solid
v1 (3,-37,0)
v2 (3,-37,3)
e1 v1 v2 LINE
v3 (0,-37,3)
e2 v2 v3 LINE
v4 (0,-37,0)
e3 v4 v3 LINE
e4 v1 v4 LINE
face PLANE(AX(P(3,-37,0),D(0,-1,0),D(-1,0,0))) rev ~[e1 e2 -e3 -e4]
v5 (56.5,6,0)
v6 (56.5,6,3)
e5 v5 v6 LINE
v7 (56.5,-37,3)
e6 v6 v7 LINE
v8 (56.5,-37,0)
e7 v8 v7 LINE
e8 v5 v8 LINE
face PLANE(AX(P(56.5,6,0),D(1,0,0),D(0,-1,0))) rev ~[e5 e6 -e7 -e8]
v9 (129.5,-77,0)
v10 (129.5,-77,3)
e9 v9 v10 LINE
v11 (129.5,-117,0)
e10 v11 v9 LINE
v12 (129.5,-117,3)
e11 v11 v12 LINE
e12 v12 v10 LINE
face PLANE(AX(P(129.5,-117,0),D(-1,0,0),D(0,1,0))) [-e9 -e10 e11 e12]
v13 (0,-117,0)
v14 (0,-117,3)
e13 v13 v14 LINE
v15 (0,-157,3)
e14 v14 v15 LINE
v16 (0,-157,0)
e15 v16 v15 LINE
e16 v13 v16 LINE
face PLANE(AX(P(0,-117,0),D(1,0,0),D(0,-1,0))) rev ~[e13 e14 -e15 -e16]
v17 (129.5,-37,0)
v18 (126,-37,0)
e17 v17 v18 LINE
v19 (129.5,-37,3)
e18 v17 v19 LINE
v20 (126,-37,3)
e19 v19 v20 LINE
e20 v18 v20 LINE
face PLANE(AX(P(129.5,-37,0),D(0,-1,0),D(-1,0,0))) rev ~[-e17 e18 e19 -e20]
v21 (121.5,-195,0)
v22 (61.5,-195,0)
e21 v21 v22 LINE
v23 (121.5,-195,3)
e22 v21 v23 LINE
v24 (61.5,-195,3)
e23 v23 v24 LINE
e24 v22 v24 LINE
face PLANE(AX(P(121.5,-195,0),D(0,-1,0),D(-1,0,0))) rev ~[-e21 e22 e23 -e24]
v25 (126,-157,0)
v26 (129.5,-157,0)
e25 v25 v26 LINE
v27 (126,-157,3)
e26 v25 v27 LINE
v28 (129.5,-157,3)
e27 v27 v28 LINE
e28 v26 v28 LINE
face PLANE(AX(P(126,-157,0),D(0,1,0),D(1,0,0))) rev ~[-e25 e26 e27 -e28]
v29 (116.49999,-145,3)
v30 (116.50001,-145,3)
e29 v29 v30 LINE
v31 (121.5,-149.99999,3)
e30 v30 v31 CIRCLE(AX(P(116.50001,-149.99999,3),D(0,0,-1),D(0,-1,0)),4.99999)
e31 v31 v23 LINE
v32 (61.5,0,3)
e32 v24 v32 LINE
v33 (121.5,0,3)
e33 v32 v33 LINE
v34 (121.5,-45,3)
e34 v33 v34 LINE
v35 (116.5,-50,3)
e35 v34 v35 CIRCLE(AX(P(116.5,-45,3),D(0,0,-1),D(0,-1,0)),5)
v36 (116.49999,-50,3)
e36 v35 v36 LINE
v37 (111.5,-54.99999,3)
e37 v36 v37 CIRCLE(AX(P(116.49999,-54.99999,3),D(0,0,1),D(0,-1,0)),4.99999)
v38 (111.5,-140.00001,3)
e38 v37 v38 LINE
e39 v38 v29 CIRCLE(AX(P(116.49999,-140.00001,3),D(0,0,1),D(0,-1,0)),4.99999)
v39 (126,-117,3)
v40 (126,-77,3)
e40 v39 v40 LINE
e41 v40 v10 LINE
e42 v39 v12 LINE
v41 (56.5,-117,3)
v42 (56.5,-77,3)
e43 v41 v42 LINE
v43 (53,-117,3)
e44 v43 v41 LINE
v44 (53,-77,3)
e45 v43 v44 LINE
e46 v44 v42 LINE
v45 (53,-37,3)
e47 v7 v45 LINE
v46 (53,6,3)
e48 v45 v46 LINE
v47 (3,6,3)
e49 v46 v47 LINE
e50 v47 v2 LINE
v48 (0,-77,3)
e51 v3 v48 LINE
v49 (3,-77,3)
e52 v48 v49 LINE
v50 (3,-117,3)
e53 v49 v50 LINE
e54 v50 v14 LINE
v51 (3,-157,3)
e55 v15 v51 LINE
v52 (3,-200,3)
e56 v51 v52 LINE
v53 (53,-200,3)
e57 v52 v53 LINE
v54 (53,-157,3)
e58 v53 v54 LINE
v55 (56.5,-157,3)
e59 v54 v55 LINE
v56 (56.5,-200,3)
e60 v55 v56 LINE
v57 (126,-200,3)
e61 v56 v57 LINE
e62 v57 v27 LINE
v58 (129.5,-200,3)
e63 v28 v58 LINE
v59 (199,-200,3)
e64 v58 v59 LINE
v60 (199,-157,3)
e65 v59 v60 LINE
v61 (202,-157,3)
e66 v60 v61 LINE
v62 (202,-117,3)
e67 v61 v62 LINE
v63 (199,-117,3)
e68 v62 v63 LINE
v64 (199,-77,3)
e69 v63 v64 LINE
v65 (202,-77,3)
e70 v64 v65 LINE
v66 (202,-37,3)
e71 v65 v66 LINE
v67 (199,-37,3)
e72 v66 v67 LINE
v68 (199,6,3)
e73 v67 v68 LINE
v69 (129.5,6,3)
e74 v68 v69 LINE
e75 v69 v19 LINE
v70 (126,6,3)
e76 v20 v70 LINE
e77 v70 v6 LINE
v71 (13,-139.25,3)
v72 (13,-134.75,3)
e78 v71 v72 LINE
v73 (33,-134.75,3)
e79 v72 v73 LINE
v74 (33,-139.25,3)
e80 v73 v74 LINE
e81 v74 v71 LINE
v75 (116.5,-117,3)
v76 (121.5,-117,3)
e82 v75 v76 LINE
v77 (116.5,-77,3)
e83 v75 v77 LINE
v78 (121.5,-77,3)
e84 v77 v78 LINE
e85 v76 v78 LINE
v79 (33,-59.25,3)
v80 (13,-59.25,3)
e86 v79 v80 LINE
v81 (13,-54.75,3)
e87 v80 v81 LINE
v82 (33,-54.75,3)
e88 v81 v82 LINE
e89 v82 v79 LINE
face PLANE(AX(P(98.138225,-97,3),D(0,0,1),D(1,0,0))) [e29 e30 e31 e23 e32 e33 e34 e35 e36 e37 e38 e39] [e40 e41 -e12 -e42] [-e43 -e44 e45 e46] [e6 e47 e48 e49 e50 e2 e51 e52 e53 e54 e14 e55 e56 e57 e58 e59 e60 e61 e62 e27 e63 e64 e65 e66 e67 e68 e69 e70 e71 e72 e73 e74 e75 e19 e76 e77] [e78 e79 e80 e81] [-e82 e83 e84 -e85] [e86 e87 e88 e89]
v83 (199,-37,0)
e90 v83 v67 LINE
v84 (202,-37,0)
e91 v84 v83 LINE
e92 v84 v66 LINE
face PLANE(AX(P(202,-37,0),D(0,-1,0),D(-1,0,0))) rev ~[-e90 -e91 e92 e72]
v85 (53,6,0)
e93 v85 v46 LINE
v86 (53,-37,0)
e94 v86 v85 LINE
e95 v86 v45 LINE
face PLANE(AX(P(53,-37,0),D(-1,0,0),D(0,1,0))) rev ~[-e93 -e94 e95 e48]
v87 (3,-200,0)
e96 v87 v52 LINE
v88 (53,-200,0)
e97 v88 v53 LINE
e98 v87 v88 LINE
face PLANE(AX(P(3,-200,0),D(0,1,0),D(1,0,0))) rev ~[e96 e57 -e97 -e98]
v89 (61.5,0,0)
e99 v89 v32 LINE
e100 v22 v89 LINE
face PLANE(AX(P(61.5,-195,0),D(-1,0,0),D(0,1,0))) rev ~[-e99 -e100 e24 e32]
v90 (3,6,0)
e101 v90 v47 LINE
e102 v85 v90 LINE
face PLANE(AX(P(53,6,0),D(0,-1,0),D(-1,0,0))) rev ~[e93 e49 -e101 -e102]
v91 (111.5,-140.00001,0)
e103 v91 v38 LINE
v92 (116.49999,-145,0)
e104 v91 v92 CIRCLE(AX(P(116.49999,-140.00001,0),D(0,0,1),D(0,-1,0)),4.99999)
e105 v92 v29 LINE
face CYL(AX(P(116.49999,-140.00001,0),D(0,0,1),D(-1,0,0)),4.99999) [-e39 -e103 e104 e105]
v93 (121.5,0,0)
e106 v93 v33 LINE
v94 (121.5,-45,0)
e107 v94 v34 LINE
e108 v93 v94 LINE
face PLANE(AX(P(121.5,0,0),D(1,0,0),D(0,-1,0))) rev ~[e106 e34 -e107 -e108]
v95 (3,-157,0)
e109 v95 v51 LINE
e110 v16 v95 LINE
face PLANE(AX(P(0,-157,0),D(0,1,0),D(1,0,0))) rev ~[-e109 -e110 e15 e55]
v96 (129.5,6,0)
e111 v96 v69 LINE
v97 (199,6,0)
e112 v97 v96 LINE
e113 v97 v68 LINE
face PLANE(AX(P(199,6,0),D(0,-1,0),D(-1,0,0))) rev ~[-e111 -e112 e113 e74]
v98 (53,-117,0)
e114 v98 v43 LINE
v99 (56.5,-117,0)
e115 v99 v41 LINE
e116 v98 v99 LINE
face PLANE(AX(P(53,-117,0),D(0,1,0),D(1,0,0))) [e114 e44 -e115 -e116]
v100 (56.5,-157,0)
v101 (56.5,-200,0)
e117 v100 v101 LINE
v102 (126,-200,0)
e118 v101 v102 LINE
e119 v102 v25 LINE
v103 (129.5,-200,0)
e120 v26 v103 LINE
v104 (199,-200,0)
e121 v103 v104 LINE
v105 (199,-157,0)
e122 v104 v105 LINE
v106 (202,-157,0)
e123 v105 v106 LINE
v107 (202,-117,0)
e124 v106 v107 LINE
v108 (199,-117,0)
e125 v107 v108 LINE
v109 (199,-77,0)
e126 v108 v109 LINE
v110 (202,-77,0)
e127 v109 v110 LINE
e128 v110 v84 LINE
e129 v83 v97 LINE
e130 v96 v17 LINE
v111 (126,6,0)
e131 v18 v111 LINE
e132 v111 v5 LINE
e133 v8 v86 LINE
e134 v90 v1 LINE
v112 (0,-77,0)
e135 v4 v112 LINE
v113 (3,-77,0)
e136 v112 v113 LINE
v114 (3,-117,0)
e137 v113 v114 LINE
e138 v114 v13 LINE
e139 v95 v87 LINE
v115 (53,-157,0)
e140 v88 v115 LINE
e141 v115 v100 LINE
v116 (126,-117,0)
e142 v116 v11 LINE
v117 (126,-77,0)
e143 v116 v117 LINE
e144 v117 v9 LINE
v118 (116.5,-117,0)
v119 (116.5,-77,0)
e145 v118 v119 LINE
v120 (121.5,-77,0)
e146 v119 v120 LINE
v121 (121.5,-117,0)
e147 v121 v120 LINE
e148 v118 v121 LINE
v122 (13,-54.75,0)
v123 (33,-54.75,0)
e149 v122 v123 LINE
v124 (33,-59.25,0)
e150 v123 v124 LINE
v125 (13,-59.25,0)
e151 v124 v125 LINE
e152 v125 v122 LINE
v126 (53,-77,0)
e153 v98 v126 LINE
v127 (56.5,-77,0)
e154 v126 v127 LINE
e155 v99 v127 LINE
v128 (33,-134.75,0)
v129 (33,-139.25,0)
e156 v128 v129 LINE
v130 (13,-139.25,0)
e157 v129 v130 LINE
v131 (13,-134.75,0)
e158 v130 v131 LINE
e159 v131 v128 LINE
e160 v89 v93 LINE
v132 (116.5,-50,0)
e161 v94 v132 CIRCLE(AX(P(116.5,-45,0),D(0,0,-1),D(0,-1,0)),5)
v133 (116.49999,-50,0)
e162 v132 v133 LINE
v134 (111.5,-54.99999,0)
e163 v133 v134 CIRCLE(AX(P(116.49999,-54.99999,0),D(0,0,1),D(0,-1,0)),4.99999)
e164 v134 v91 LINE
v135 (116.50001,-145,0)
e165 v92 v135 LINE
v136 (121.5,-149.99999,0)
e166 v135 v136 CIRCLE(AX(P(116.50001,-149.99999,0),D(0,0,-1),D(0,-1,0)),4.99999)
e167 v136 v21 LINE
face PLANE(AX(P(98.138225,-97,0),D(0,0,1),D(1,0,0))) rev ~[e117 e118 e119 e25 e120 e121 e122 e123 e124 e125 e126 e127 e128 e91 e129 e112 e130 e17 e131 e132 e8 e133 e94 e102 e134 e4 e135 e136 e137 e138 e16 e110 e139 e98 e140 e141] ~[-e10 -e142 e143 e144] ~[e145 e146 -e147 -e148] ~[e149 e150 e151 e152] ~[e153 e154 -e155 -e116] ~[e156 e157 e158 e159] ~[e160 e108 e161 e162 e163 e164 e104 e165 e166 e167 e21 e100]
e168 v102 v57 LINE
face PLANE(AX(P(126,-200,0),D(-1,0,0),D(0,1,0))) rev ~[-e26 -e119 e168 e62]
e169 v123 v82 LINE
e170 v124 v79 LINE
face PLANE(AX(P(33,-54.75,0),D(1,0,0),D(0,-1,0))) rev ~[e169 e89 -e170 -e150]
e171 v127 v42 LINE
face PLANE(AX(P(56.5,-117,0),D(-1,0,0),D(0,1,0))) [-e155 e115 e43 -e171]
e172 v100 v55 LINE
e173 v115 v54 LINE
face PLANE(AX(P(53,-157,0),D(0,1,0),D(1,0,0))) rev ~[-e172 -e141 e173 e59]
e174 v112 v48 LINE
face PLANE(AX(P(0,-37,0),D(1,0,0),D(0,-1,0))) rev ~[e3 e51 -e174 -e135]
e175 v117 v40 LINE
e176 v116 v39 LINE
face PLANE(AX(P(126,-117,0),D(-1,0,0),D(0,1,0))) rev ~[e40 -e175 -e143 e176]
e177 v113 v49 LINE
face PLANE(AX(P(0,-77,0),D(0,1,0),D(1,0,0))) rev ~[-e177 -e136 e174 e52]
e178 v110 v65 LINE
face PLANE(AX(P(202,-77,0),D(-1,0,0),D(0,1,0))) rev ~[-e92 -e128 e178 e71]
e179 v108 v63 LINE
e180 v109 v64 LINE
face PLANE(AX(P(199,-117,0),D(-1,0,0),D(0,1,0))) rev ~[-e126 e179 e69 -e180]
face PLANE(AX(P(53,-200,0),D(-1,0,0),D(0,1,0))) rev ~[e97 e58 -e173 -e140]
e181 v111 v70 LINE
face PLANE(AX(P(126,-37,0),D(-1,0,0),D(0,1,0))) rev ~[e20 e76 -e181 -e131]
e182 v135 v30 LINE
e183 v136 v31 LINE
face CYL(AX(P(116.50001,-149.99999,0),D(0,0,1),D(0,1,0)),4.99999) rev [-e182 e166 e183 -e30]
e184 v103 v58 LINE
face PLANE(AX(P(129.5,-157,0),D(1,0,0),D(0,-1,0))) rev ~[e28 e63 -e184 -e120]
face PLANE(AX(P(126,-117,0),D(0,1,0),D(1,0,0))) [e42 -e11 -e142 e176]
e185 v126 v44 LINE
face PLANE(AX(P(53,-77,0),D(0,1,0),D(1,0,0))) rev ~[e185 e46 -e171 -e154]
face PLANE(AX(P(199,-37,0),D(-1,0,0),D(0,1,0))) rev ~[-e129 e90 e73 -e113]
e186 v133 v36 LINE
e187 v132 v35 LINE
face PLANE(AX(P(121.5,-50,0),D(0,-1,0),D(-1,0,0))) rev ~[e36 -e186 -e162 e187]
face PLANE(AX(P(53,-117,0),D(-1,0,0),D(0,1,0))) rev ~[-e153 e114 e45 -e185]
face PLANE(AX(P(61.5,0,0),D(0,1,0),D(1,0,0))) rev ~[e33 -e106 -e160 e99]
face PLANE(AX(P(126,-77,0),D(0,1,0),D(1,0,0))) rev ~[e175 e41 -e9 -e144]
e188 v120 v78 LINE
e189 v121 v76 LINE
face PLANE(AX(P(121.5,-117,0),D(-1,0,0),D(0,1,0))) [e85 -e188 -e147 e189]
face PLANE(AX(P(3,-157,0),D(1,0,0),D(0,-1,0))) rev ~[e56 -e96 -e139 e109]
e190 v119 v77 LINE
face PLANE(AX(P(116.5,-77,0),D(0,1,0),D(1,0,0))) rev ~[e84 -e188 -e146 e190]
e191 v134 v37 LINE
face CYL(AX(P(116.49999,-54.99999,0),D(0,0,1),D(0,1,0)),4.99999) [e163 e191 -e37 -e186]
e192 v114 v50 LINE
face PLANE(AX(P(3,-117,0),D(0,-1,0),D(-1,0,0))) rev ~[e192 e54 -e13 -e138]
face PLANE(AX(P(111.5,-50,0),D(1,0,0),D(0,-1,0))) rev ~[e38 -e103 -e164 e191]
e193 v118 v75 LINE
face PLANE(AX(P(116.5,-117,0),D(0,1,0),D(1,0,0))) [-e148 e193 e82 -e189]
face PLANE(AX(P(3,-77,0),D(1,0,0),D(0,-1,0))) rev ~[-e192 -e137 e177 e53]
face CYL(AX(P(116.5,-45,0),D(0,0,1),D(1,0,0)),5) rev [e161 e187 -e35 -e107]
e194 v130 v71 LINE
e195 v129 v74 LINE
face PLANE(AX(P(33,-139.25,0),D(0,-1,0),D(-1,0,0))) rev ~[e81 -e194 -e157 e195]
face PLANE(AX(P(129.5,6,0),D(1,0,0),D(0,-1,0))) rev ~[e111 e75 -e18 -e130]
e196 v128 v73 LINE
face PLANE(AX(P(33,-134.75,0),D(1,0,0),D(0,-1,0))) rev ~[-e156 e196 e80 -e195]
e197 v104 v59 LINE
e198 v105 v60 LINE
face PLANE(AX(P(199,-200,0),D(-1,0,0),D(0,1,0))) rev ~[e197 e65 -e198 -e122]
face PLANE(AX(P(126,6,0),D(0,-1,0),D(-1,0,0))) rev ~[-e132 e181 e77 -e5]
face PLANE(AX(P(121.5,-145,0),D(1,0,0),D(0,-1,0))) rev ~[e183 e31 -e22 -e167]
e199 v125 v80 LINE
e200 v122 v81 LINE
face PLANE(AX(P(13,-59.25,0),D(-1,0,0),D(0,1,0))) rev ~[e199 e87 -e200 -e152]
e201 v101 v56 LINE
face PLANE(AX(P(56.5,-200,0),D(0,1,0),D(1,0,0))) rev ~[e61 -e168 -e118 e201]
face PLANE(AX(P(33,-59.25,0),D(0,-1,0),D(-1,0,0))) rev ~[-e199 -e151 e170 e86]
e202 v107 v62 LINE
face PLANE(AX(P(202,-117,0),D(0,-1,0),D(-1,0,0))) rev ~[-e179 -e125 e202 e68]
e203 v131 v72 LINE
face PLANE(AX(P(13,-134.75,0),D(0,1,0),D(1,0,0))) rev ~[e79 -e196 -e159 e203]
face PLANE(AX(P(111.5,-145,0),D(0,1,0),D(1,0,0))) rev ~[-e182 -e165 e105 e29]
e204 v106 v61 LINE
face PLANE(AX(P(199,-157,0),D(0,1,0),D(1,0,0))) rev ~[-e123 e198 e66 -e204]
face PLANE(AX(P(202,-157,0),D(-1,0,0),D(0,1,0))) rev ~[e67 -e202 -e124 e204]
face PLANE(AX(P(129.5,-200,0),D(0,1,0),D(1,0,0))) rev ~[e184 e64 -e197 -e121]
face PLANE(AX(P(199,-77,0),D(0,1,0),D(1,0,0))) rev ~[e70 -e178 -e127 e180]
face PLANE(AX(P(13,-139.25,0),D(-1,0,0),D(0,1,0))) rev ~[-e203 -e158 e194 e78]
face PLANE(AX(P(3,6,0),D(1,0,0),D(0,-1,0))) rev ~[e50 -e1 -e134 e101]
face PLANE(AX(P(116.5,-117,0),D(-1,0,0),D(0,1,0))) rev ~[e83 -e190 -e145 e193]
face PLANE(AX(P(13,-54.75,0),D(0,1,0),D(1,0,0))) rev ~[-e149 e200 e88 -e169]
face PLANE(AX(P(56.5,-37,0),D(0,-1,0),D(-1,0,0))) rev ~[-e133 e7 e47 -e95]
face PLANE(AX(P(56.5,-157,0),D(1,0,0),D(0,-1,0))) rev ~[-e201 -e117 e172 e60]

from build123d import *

# Parameters (mm, degrees)
F0_W     = 3.5
F0_H     = 40
F0_W_2   = 5
F1_DEPTH = 3
F2_R     = 5
F3_R     = 4.99999
F4_R     = 4.99999


# Not quite as in the source:
# - a fillet or chamfer is up to 0.001 mm smaller than in the source, because OpenCascade refuses the exact size


with BuildPart() as f1:
    # F0 (on Top) → F1 (new body)
    with BuildSketch(Plane.XY):
        Polygon((129.5, -200), (199, -200), (199, -157), (202, -157), (202, -117), (199, -117), (199, -77), (202, -77), (202, -37), (199, -37), (199, 6), (129.5, 6), (129.5, -37), (126, -37), (126, 6), (56.5, 6), (56.5, -37), (53, -37), (53, 6), (3, 6), (3, -37), (0, -37), (0, -77), (3, -77), (3, -117), (0, -117), (0, -157), (3, -157), (3, -200), (53, -200), (53, -157), (56.5, -157), (56.5, -200), (126, -200), (126, -157), (129.5, -157), align=None)
        Polygon((33, -134.75), (33, -137), (33, -139.25), (13, -139.25), (13, -134.75), align=None, mode=Mode.SUBTRACT)
        with Locations((54.75, -97)):
            Rectangle(F0_W, F0_H, mode=Mode.SUBTRACT)
        Polygon((61.5, -195), (61.5, -97), (61.5, 0), (121.5, 0), (121.5, -50), (111.5, -50), (111.5, -145), (121.5, -145), (121.5, -195), align=None, mode=Mode.SUBTRACT)
        with Locations((119, -97)):
            Rectangle(F0_W_2, F0_H, mode=Mode.SUBTRACT)
        with Locations((127.75, -97)):
            Rectangle(F0_W, F0_H, mode=Mode.SUBTRACT)
        Polygon((33, -54.75), (33, -57), (33, -59.25), (13, -59.25), (13, -54.75), align=None, mode=Mode.SUBTRACT)
    extrude(amount=F1_DEPTH)

    # F2
    f2_edges = [f1.edges().sort_by_distance(p)[0] for p in [
        (121.5, -50, 1.5),
    ]]
    fillet(f2_edges, radius=F2_R)

    # F3 (radius 5 in the source; OpenCascade refuses exactly that, so slightly less here)
    f3_edges = [f1.edges().sort_by_distance(p)[0] for p in [
        (111.5, -50, 1.5),
    ]]
    fillet(f3_edges, radius=F3_R)

    # F4 (radius 5 in the source; OpenCascade refuses exactly that, so slightly less here)
    f4_edges = [f1.edges().sort_by_distance(p)[0] for p in [
        (121.5, -145, 1.5),
        (111.5, -145, 1.5),
    ]]
    fillet(f4_edges, radius=F4_R)


solid = f1.part
